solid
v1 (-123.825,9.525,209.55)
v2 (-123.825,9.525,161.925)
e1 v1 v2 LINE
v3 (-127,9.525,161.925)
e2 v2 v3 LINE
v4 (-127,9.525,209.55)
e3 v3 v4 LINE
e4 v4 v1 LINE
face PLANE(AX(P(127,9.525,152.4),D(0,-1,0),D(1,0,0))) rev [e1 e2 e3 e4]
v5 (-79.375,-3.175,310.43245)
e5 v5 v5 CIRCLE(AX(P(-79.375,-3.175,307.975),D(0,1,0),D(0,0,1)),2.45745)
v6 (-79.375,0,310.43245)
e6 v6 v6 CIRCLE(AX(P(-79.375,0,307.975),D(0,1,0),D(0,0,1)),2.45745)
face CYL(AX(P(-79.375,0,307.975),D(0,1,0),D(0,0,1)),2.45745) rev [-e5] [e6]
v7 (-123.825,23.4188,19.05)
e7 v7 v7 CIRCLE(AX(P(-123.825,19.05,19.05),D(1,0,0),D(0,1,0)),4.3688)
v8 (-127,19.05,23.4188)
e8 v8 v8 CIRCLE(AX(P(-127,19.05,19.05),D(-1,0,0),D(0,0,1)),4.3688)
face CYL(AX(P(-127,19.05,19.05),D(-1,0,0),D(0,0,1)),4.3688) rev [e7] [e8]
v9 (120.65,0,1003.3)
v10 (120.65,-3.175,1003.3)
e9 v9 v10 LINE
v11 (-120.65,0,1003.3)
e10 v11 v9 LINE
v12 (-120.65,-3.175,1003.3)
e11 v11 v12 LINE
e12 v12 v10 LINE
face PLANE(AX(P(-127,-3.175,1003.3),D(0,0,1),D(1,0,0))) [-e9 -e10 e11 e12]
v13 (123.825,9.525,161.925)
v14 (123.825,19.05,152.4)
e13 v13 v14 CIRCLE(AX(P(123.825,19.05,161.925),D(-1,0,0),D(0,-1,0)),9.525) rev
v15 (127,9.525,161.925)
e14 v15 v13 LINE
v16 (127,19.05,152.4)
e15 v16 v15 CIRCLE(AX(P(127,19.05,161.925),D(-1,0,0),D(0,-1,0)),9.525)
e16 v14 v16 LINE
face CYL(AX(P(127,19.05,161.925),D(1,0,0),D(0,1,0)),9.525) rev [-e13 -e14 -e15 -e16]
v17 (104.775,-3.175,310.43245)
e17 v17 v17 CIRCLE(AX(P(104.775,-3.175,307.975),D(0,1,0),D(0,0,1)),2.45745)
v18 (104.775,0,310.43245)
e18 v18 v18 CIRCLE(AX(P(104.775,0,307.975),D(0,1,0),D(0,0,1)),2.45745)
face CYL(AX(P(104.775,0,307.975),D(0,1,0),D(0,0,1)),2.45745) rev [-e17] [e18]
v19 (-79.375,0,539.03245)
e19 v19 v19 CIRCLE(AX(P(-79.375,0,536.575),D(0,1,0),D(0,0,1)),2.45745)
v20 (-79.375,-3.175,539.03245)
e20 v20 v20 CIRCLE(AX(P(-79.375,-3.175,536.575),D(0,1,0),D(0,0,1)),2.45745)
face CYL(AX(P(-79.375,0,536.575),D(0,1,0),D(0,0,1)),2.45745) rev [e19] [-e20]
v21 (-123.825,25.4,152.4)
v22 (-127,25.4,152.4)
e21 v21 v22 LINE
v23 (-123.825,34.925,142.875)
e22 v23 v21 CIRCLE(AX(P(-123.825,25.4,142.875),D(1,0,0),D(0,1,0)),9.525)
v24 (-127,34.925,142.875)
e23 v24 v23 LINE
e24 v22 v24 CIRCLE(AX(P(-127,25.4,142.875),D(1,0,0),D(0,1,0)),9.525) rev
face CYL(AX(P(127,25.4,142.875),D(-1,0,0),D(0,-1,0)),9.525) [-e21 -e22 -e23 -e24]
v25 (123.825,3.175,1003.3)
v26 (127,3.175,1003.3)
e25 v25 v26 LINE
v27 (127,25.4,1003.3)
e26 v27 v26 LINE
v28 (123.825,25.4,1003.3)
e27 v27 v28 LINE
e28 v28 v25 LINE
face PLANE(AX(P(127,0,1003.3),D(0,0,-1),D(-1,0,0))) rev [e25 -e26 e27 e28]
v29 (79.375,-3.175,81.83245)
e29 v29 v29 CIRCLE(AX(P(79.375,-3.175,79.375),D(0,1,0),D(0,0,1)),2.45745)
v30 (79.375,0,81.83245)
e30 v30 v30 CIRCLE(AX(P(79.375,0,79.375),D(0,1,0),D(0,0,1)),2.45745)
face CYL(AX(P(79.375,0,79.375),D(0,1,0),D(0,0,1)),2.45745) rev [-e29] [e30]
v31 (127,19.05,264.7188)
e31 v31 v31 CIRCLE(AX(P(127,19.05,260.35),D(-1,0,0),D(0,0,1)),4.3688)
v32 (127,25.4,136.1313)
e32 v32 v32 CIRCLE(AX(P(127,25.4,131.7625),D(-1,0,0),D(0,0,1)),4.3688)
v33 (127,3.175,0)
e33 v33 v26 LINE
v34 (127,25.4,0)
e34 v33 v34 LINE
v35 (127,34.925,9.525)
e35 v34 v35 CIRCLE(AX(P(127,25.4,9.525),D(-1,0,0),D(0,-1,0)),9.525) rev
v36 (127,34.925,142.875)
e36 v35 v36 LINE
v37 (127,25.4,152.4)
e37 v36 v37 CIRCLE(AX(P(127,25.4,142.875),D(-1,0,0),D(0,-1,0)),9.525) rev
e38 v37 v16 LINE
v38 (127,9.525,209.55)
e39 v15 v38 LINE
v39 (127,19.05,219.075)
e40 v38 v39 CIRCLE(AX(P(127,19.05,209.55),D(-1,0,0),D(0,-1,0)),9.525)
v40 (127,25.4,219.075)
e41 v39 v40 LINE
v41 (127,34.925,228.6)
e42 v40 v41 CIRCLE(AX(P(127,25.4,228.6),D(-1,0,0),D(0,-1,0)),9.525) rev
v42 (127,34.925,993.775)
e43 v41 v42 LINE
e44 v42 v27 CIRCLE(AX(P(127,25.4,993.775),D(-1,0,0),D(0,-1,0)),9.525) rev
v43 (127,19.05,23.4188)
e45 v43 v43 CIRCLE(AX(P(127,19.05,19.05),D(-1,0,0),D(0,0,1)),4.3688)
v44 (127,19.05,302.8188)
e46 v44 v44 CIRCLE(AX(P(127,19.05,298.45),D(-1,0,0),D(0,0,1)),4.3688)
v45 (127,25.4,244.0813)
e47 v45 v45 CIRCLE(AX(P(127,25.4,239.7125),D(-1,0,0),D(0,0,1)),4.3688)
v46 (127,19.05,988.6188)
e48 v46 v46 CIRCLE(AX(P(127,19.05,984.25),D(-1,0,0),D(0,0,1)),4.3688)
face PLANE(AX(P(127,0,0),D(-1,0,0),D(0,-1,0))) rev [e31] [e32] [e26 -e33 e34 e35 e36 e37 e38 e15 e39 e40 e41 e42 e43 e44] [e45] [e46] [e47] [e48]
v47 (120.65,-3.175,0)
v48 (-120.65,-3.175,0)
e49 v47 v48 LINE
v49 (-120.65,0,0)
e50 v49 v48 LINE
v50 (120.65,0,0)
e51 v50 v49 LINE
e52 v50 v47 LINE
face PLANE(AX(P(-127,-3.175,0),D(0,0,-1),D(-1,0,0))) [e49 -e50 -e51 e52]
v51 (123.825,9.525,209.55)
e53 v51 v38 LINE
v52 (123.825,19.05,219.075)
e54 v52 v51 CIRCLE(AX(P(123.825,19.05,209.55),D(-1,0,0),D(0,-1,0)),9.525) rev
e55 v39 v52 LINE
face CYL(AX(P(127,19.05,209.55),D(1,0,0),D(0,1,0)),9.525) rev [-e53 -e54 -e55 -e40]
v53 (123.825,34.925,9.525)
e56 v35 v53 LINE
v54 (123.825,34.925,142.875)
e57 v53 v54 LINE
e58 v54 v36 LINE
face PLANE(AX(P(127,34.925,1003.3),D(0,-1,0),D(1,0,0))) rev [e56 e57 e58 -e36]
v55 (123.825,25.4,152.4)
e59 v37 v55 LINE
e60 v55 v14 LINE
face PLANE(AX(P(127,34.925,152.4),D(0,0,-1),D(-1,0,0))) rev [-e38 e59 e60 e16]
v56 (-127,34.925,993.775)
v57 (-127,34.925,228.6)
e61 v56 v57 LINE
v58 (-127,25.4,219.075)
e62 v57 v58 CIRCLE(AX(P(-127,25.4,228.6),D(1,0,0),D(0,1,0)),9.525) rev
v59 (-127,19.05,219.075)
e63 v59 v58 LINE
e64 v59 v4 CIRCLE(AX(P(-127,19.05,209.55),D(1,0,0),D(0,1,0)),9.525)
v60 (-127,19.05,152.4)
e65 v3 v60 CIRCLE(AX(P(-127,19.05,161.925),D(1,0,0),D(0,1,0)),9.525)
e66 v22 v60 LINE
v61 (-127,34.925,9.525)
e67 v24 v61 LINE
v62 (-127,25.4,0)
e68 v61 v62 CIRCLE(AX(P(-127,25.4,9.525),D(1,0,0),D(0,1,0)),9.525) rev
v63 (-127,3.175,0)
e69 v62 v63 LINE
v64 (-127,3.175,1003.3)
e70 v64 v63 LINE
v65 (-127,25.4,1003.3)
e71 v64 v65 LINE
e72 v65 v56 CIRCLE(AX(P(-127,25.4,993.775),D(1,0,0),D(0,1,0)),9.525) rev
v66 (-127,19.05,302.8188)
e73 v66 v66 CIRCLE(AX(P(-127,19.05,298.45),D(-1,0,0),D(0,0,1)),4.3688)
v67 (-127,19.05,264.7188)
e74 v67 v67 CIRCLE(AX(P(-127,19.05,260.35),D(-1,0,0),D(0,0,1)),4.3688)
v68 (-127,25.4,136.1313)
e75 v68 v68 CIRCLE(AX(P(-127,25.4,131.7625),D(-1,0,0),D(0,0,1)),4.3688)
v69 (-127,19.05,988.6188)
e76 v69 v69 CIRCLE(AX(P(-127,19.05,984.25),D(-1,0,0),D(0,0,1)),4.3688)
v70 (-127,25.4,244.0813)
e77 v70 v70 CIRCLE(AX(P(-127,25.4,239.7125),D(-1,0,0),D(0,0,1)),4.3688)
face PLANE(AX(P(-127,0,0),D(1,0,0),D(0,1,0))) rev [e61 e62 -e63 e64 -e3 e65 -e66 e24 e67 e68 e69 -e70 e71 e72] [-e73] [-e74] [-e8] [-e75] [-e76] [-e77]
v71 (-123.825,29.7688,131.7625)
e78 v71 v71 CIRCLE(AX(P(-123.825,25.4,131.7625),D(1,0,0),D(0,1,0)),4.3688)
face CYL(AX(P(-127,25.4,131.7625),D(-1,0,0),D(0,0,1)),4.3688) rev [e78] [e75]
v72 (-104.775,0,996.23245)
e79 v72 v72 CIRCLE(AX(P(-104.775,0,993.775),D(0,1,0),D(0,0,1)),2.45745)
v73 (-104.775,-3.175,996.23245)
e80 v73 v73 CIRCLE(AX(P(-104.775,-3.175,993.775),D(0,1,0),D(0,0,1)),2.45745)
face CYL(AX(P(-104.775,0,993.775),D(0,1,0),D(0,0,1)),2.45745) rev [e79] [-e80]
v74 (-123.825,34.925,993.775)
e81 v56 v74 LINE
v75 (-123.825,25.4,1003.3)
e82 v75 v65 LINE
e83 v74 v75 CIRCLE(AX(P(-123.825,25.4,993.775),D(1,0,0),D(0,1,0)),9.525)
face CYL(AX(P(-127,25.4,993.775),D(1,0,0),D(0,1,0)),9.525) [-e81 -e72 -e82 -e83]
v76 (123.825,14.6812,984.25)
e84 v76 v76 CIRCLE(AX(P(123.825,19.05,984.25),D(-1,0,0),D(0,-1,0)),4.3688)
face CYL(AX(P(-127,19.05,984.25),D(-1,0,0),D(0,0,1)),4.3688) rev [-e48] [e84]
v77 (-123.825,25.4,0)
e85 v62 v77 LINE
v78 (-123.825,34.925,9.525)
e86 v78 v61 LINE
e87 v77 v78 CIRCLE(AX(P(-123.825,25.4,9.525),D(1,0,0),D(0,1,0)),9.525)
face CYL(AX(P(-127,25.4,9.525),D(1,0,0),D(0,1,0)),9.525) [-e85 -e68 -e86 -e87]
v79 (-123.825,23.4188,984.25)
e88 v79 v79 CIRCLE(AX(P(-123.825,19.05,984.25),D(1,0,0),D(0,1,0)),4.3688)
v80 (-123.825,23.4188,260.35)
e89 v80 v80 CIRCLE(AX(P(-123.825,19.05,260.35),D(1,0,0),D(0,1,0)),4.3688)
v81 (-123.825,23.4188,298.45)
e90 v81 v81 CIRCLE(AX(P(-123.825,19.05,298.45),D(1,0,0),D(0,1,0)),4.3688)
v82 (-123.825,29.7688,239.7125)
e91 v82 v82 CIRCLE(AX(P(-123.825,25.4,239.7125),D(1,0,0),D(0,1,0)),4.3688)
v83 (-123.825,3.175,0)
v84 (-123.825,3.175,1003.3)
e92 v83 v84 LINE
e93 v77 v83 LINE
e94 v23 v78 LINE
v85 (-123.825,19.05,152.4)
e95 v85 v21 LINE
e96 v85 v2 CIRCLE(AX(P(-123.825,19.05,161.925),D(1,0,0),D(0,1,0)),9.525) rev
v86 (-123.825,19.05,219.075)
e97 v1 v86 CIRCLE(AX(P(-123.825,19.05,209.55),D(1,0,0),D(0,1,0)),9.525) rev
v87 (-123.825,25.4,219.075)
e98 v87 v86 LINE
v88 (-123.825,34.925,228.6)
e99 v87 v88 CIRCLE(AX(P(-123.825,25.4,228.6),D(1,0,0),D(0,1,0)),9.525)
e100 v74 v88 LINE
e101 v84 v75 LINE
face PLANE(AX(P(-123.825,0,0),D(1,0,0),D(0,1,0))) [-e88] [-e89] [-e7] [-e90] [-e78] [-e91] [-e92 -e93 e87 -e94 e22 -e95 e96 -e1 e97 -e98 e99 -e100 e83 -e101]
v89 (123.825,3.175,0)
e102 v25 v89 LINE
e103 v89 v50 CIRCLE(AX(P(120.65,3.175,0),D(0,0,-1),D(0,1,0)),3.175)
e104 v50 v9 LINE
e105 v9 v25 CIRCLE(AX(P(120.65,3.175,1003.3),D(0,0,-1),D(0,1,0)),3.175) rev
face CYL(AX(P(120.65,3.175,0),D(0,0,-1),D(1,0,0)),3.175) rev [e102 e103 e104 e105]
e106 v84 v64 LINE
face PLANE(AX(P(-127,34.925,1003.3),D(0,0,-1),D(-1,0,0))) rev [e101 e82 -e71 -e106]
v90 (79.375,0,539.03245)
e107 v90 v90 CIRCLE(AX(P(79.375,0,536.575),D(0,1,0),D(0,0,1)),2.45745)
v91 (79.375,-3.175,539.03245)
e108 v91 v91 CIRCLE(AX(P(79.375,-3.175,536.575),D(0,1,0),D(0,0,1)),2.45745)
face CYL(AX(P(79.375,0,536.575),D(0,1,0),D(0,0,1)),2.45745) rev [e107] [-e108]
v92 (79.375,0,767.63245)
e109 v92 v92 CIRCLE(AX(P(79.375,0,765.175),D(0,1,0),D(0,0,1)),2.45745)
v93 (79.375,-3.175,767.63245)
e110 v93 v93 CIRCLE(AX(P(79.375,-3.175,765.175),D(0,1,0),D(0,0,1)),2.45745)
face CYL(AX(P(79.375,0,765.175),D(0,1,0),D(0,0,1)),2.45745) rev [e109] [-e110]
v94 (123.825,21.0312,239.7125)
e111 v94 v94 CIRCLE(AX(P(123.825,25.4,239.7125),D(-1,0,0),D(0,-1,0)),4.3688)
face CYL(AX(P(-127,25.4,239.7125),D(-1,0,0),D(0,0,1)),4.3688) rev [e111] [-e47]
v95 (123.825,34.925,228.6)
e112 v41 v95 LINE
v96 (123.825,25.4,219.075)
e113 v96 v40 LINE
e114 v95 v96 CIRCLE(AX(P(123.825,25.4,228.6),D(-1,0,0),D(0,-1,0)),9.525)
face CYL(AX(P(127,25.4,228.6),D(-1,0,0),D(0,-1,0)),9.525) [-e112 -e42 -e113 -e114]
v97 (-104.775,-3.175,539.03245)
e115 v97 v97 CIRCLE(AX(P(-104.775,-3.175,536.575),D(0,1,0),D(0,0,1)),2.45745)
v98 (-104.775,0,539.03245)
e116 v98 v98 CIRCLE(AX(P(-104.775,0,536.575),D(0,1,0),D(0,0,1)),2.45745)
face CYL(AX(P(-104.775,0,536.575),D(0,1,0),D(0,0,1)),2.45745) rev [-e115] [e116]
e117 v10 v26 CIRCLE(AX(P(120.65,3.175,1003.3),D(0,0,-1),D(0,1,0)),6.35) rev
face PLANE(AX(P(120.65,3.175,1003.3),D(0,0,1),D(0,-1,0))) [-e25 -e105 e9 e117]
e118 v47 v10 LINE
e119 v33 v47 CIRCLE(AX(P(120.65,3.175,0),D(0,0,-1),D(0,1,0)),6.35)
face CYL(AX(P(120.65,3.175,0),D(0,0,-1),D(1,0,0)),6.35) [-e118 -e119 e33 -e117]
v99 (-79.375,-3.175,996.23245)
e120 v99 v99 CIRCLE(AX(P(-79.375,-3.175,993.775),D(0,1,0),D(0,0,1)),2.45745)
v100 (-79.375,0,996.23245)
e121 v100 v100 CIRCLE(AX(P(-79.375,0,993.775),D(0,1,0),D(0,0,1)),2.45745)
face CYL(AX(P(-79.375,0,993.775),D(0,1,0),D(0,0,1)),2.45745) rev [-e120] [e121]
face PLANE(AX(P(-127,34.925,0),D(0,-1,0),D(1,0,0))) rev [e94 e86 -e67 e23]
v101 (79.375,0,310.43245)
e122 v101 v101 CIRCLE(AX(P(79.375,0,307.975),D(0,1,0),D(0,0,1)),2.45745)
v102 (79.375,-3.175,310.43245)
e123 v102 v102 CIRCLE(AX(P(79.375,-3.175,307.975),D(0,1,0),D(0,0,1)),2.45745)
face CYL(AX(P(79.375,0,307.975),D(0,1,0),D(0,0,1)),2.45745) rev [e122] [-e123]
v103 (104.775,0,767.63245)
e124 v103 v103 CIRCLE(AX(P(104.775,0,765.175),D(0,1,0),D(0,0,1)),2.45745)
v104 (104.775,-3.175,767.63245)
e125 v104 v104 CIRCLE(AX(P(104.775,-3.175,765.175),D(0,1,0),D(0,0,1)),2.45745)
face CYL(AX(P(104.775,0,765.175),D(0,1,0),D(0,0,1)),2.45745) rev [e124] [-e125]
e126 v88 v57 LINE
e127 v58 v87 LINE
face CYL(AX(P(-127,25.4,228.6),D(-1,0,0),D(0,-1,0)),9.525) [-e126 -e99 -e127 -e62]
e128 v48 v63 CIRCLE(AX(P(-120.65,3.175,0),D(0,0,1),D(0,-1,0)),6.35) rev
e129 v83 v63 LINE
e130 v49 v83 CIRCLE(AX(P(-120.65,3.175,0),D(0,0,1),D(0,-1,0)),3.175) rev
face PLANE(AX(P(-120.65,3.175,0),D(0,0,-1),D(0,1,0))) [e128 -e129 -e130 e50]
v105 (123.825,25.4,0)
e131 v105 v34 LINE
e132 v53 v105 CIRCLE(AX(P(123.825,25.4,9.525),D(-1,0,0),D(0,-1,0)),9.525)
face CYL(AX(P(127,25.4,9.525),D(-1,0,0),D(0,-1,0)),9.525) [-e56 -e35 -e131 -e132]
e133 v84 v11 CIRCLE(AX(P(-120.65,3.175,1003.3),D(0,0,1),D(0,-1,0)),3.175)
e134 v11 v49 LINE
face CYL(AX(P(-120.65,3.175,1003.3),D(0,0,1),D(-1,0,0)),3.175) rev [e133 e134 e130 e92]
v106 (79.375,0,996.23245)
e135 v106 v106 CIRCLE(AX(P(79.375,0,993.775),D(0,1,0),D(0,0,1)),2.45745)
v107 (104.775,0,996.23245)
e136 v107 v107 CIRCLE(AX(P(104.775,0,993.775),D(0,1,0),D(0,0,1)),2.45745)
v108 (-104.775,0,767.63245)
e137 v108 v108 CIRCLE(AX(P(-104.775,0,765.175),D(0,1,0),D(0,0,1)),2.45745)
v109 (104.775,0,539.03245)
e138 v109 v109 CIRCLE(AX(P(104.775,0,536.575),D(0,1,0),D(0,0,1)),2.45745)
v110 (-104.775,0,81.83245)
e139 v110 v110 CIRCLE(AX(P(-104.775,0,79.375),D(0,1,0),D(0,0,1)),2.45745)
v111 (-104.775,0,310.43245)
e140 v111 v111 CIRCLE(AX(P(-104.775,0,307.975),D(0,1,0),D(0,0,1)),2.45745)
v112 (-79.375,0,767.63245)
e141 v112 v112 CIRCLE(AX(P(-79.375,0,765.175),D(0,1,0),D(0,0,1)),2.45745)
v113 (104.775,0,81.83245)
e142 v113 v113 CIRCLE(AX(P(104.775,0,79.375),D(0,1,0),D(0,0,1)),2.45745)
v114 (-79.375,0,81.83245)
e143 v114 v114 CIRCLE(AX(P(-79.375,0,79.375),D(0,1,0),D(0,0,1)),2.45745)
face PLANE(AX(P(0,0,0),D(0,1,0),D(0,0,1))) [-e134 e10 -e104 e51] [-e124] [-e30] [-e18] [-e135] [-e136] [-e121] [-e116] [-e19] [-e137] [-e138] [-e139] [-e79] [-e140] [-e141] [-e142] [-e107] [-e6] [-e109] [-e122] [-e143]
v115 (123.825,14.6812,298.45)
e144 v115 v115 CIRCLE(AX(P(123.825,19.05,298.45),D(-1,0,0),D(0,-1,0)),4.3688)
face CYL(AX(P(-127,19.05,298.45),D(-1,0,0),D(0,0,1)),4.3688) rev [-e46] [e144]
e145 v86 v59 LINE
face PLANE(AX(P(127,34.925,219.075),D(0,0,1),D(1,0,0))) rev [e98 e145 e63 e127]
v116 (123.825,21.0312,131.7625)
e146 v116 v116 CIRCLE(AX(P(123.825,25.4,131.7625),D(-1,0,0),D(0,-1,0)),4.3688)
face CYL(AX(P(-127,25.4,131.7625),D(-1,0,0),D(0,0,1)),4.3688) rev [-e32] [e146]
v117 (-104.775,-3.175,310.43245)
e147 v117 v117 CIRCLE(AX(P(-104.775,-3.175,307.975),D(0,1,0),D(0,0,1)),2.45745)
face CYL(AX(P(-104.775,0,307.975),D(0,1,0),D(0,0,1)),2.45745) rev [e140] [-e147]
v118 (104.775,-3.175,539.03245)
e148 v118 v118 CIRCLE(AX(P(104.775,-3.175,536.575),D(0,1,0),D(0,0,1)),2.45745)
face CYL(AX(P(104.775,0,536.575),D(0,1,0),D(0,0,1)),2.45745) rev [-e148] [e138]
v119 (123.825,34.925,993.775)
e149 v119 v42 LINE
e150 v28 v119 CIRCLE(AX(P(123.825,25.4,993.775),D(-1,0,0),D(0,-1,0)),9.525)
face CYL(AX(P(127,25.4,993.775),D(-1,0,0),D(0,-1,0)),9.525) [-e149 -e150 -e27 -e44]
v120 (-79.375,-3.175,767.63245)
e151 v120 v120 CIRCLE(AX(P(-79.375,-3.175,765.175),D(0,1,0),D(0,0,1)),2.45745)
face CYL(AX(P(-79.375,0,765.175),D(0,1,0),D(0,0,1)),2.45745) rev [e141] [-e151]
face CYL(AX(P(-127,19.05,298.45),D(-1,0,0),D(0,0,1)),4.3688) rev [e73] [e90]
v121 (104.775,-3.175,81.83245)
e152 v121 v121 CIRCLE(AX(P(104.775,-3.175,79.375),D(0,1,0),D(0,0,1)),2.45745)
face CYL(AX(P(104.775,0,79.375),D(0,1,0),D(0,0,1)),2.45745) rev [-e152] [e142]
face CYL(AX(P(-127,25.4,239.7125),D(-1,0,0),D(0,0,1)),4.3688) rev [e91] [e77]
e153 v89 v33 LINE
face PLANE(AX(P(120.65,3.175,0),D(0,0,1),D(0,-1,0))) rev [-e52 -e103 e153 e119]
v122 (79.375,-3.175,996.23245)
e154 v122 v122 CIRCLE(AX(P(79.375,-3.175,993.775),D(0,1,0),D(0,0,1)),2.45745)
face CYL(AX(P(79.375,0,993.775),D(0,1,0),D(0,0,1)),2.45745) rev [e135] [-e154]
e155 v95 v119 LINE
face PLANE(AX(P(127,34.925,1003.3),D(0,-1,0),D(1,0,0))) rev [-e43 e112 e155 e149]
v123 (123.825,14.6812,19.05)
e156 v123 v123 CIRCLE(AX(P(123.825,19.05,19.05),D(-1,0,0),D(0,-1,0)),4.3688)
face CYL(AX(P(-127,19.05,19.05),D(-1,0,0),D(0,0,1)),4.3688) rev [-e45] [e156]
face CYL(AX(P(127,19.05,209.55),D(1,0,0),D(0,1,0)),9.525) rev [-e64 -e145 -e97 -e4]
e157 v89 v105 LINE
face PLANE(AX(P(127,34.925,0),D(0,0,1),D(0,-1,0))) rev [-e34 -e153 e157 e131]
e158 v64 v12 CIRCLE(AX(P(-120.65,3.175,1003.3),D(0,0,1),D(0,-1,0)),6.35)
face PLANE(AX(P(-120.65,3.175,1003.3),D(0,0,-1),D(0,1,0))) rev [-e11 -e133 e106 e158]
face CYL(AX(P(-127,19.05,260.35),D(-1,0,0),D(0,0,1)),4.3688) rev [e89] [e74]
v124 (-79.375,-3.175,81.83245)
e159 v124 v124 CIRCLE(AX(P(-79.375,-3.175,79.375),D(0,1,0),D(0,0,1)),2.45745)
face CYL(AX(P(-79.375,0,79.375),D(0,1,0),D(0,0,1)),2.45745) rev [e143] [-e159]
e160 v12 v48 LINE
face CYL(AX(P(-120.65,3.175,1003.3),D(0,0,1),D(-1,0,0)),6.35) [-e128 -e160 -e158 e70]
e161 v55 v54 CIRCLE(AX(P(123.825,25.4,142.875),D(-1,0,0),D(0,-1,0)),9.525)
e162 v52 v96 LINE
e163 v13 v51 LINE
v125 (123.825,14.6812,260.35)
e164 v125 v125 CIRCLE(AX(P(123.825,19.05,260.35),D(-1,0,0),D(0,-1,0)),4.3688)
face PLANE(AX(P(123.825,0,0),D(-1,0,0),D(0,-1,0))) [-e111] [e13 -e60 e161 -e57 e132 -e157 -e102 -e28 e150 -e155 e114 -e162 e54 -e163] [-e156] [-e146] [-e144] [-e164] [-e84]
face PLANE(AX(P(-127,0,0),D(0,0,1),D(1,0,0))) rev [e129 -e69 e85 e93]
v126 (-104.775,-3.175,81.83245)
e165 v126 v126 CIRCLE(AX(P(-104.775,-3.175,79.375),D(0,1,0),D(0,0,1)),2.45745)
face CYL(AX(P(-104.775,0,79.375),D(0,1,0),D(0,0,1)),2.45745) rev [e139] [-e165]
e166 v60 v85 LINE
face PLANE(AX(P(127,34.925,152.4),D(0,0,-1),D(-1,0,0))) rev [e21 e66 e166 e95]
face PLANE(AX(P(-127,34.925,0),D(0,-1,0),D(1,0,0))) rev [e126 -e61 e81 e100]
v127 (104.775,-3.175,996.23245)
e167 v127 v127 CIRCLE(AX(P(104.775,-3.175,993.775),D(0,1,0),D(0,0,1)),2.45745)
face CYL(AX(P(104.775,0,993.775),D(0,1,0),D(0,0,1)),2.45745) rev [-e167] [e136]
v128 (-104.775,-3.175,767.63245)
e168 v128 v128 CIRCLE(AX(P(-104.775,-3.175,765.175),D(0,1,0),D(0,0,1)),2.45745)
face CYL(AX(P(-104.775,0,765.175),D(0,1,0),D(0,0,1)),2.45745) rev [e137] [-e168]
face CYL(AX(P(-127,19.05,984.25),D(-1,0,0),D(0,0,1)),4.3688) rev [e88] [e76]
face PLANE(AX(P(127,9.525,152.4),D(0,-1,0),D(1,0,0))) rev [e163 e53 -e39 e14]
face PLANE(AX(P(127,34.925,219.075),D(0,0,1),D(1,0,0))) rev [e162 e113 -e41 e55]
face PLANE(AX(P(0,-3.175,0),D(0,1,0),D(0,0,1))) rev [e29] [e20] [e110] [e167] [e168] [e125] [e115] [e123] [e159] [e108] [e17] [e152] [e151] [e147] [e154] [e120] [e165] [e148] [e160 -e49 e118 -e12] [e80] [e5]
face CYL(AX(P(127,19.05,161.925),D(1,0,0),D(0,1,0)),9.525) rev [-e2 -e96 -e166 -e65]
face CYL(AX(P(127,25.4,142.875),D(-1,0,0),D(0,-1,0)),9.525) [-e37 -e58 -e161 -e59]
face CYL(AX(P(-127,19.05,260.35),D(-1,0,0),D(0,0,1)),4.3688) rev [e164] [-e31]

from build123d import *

# Parameters (mm, degrees)
SKETCH1_W                                 = 254
SKETCH1_H                                 = 1003.3
BASE_FLANGE1_DEPTH                        = 3.175
EDGE_FLANGE1_STRIP_W                      = 19.05
EDGE_FLANGE1_STRIP_H                      = 3.175
EDGE_FLANGE1_STRIP_CUT_DEPTH              = 1003.3
EDGE_FLANGE1_STRIP_2_W                    = 19.05
EDGE_FLANGE1_STRIP_2_H                    = 3.175
EDGE_FLANGE1_STRIP_CUT_2_DEPTH            = 1003.3
EDGE_FLANGE1_DEPTH                        = 1003.3
EDGE_FLANGE1_BEND_DEPTH                   = 1003.3
SKETCH30_W                                = 66.675
SKETCH30_H                                = 25.4
CUT_EXTRUDE4_DEPTH                        = 1036.541716024
HOLE_FOR_1_4_SELF_CLINCHING_NUTS_S_SS_C_D = 8.7376
F_10_0_1935_DIAMETER_HOLE1_D              = 4.9149
FILLET5_R                                 = 9.525


# Sheet-metal steps are written as plain solids
with BuildPart() as part:
    # Sketch1 → Base-Flange1 (new body)
    with BuildSketch(Plane(origin=(0, 0, 0), x_dir=(1, 0, 0), z_dir=(0, 1, 0))):
        with Locations((0, -501.65)):
            Rectangle(SKETCH1_W, SKETCH1_H)
    extrude(amount=-BASE_FLANGE1_DEPTH)

    # Edge-Flange1 strip (across the edge) → Edge-Flange1 strip cut (cut)
    with BuildSketch(Plane(origin=(-127, 0, 0), x_dir=(1, 0, 0), z_dir=(0, 0, 1))):
        with Locations((-3.175, -1.5875)):
            Rectangle(EDGE_FLANGE1_STRIP_W, EDGE_FLANGE1_STRIP_H)
    extrude(amount=EDGE_FLANGE1_STRIP_CUT_DEPTH, mode=Mode.SUBTRACT)

    # Edge-Flange1 strip 2 (across the edge) → Edge-Flange1 strip cut 2 (cut)
    with BuildSketch(Plane(origin=(127, 0, 1003.3), x_dir=(-1, 0, 0), z_dir=(0, 0, -1))):
        with Locations((-3.175, -1.5875)):
            Rectangle(EDGE_FLANGE1_STRIP_2_W, EDGE_FLANGE1_STRIP_2_H)
    extrude(amount=EDGE_FLANGE1_STRIP_CUT_2_DEPTH, mode=Mode.SUBTRACT)

    # Edge-Flange1 section (across the edge) → Edge-Flange1 (add)
    with BuildSketch(Plane(origin=(-127, 0, 0), x_dir=(1, 0, 0), z_dir=(0, 0, 1))):
        with BuildLine():
            Line((0, 3.175), (0, 34.925))
            Line((0, 34.925), (3.175, 34.925))
            Line((3.175, 34.925), (3.175, 3.175))
            ThreePointArc((3.175, 3.175), (4.10493597, 0.92993597), (6.35, 0))
            Line((6.35, 0), (6.35, -3.175))
            ThreePointArc((6.35, -3.175), (1.859871939, -1.315128061), (0, 3.175))
        make_face()
    extrude(amount=EDGE_FLANGE1_DEPTH)

    # Edge-Flange1 section 2 (across the edge) → Edge-Flange1 bend (add)
    with BuildSketch(Plane(origin=(127, 0, 1003.3), x_dir=(-1, 0, 0), z_dir=(0, 0, -1))):
        with BuildLine():
            Line((0, 3.175), (0, 34.925))
            Line((0, 34.925), (3.175, 34.925))
            Line((3.175, 34.925), (3.175, 3.175))
            ThreePointArc((3.175, 3.175), (4.10493597, 0.92993597), (6.35, 0))
            Line((6.35, 0), (6.35, -3.175))
            ThreePointArc((6.35, -3.175), (1.859871939, -1.315128061), (0, 3.175))
        make_face()
    extrude(amount=EDGE_FLANGE1_BEND_DEPTH)

    # Sketch30 → Cut-Extrude4 (cut, through all)
    with BuildSketch(Plane.ZY.offset(127)):
        with Locations((185.7375, 22.225)):
            Rectangle(SKETCH30_W, SKETCH30_H)
    extrude(amount=-CUT_EXTRUDE4_DEPTH, mode=Mode.SUBTRACT)

    # Hole for 1/4 Self-clinching Nuts (S,SS,CLS,CLSS)1 (through all)
    with Locations(Plane.ZY.offset(127)):
        with Locations((19.05, 19.05), (260.35, 19.05), (298.45, 19.05), (984.25, 19.05), (239.7125, 25.4), (131.7625, 25.4)):
            Hole(HOLE_FOR_1_4_SELF_CLINCHING_NUTS_S_SS_C_D / 2)

    # #10 (0.1935) Diameter Hole1 (through all)
    with Locations(Plane(origin=(0, 0, 0), x_dir=(1, 0, 0), z_dir=(0, 1, 0))):
        with Locations((104.775, -79.375), (79.375, -79.375), (-79.375, -79.375), (-104.775, -79.375), (-104.775, -307.975), (-79.375, -307.975), (79.375, -307.975), (104.775, -307.975), (104.775, -536.575), (79.375, -536.575), (-79.375, -765.175), (-79.375, -536.575), (-104.775, -536.575), (-104.775, -765.175), (79.375, -765.175), (104.775, -765.175), (104.775, -993.775), (79.375, -993.775), (-79.375, -993.775), (-104.775, -993.775)):
            Hole(F_10_0_1935_DIAMETER_HOLE1_D / 2)

    # Fillet5
    fillet5_edges = [part.edges().sort_by_distance(p)[0] for p in [
        (-125.4125, 34.925, 0),
        (-125.4125, 34.925, 1003.3),
        (125.4125, 34.925, 1003.3),
        (125.4125, 34.925, 0),
        (-125.4125, 34.925, 152.4),
        (-125.4125, 9.525, 219.075),
        (-125.4125, 9.525, 152.4),
        (-125.4125, 34.925, 219.075),
        (125.4125, 9.525, 152.4),
        (125.4125, 34.925, 152.4),
        (125.4125, 34.925, 219.075),
        (125.4125, 9.525, 219.075),
    ]]
    fillet(fillet5_edges, radius=FILLET5_R)


solid = part.part
